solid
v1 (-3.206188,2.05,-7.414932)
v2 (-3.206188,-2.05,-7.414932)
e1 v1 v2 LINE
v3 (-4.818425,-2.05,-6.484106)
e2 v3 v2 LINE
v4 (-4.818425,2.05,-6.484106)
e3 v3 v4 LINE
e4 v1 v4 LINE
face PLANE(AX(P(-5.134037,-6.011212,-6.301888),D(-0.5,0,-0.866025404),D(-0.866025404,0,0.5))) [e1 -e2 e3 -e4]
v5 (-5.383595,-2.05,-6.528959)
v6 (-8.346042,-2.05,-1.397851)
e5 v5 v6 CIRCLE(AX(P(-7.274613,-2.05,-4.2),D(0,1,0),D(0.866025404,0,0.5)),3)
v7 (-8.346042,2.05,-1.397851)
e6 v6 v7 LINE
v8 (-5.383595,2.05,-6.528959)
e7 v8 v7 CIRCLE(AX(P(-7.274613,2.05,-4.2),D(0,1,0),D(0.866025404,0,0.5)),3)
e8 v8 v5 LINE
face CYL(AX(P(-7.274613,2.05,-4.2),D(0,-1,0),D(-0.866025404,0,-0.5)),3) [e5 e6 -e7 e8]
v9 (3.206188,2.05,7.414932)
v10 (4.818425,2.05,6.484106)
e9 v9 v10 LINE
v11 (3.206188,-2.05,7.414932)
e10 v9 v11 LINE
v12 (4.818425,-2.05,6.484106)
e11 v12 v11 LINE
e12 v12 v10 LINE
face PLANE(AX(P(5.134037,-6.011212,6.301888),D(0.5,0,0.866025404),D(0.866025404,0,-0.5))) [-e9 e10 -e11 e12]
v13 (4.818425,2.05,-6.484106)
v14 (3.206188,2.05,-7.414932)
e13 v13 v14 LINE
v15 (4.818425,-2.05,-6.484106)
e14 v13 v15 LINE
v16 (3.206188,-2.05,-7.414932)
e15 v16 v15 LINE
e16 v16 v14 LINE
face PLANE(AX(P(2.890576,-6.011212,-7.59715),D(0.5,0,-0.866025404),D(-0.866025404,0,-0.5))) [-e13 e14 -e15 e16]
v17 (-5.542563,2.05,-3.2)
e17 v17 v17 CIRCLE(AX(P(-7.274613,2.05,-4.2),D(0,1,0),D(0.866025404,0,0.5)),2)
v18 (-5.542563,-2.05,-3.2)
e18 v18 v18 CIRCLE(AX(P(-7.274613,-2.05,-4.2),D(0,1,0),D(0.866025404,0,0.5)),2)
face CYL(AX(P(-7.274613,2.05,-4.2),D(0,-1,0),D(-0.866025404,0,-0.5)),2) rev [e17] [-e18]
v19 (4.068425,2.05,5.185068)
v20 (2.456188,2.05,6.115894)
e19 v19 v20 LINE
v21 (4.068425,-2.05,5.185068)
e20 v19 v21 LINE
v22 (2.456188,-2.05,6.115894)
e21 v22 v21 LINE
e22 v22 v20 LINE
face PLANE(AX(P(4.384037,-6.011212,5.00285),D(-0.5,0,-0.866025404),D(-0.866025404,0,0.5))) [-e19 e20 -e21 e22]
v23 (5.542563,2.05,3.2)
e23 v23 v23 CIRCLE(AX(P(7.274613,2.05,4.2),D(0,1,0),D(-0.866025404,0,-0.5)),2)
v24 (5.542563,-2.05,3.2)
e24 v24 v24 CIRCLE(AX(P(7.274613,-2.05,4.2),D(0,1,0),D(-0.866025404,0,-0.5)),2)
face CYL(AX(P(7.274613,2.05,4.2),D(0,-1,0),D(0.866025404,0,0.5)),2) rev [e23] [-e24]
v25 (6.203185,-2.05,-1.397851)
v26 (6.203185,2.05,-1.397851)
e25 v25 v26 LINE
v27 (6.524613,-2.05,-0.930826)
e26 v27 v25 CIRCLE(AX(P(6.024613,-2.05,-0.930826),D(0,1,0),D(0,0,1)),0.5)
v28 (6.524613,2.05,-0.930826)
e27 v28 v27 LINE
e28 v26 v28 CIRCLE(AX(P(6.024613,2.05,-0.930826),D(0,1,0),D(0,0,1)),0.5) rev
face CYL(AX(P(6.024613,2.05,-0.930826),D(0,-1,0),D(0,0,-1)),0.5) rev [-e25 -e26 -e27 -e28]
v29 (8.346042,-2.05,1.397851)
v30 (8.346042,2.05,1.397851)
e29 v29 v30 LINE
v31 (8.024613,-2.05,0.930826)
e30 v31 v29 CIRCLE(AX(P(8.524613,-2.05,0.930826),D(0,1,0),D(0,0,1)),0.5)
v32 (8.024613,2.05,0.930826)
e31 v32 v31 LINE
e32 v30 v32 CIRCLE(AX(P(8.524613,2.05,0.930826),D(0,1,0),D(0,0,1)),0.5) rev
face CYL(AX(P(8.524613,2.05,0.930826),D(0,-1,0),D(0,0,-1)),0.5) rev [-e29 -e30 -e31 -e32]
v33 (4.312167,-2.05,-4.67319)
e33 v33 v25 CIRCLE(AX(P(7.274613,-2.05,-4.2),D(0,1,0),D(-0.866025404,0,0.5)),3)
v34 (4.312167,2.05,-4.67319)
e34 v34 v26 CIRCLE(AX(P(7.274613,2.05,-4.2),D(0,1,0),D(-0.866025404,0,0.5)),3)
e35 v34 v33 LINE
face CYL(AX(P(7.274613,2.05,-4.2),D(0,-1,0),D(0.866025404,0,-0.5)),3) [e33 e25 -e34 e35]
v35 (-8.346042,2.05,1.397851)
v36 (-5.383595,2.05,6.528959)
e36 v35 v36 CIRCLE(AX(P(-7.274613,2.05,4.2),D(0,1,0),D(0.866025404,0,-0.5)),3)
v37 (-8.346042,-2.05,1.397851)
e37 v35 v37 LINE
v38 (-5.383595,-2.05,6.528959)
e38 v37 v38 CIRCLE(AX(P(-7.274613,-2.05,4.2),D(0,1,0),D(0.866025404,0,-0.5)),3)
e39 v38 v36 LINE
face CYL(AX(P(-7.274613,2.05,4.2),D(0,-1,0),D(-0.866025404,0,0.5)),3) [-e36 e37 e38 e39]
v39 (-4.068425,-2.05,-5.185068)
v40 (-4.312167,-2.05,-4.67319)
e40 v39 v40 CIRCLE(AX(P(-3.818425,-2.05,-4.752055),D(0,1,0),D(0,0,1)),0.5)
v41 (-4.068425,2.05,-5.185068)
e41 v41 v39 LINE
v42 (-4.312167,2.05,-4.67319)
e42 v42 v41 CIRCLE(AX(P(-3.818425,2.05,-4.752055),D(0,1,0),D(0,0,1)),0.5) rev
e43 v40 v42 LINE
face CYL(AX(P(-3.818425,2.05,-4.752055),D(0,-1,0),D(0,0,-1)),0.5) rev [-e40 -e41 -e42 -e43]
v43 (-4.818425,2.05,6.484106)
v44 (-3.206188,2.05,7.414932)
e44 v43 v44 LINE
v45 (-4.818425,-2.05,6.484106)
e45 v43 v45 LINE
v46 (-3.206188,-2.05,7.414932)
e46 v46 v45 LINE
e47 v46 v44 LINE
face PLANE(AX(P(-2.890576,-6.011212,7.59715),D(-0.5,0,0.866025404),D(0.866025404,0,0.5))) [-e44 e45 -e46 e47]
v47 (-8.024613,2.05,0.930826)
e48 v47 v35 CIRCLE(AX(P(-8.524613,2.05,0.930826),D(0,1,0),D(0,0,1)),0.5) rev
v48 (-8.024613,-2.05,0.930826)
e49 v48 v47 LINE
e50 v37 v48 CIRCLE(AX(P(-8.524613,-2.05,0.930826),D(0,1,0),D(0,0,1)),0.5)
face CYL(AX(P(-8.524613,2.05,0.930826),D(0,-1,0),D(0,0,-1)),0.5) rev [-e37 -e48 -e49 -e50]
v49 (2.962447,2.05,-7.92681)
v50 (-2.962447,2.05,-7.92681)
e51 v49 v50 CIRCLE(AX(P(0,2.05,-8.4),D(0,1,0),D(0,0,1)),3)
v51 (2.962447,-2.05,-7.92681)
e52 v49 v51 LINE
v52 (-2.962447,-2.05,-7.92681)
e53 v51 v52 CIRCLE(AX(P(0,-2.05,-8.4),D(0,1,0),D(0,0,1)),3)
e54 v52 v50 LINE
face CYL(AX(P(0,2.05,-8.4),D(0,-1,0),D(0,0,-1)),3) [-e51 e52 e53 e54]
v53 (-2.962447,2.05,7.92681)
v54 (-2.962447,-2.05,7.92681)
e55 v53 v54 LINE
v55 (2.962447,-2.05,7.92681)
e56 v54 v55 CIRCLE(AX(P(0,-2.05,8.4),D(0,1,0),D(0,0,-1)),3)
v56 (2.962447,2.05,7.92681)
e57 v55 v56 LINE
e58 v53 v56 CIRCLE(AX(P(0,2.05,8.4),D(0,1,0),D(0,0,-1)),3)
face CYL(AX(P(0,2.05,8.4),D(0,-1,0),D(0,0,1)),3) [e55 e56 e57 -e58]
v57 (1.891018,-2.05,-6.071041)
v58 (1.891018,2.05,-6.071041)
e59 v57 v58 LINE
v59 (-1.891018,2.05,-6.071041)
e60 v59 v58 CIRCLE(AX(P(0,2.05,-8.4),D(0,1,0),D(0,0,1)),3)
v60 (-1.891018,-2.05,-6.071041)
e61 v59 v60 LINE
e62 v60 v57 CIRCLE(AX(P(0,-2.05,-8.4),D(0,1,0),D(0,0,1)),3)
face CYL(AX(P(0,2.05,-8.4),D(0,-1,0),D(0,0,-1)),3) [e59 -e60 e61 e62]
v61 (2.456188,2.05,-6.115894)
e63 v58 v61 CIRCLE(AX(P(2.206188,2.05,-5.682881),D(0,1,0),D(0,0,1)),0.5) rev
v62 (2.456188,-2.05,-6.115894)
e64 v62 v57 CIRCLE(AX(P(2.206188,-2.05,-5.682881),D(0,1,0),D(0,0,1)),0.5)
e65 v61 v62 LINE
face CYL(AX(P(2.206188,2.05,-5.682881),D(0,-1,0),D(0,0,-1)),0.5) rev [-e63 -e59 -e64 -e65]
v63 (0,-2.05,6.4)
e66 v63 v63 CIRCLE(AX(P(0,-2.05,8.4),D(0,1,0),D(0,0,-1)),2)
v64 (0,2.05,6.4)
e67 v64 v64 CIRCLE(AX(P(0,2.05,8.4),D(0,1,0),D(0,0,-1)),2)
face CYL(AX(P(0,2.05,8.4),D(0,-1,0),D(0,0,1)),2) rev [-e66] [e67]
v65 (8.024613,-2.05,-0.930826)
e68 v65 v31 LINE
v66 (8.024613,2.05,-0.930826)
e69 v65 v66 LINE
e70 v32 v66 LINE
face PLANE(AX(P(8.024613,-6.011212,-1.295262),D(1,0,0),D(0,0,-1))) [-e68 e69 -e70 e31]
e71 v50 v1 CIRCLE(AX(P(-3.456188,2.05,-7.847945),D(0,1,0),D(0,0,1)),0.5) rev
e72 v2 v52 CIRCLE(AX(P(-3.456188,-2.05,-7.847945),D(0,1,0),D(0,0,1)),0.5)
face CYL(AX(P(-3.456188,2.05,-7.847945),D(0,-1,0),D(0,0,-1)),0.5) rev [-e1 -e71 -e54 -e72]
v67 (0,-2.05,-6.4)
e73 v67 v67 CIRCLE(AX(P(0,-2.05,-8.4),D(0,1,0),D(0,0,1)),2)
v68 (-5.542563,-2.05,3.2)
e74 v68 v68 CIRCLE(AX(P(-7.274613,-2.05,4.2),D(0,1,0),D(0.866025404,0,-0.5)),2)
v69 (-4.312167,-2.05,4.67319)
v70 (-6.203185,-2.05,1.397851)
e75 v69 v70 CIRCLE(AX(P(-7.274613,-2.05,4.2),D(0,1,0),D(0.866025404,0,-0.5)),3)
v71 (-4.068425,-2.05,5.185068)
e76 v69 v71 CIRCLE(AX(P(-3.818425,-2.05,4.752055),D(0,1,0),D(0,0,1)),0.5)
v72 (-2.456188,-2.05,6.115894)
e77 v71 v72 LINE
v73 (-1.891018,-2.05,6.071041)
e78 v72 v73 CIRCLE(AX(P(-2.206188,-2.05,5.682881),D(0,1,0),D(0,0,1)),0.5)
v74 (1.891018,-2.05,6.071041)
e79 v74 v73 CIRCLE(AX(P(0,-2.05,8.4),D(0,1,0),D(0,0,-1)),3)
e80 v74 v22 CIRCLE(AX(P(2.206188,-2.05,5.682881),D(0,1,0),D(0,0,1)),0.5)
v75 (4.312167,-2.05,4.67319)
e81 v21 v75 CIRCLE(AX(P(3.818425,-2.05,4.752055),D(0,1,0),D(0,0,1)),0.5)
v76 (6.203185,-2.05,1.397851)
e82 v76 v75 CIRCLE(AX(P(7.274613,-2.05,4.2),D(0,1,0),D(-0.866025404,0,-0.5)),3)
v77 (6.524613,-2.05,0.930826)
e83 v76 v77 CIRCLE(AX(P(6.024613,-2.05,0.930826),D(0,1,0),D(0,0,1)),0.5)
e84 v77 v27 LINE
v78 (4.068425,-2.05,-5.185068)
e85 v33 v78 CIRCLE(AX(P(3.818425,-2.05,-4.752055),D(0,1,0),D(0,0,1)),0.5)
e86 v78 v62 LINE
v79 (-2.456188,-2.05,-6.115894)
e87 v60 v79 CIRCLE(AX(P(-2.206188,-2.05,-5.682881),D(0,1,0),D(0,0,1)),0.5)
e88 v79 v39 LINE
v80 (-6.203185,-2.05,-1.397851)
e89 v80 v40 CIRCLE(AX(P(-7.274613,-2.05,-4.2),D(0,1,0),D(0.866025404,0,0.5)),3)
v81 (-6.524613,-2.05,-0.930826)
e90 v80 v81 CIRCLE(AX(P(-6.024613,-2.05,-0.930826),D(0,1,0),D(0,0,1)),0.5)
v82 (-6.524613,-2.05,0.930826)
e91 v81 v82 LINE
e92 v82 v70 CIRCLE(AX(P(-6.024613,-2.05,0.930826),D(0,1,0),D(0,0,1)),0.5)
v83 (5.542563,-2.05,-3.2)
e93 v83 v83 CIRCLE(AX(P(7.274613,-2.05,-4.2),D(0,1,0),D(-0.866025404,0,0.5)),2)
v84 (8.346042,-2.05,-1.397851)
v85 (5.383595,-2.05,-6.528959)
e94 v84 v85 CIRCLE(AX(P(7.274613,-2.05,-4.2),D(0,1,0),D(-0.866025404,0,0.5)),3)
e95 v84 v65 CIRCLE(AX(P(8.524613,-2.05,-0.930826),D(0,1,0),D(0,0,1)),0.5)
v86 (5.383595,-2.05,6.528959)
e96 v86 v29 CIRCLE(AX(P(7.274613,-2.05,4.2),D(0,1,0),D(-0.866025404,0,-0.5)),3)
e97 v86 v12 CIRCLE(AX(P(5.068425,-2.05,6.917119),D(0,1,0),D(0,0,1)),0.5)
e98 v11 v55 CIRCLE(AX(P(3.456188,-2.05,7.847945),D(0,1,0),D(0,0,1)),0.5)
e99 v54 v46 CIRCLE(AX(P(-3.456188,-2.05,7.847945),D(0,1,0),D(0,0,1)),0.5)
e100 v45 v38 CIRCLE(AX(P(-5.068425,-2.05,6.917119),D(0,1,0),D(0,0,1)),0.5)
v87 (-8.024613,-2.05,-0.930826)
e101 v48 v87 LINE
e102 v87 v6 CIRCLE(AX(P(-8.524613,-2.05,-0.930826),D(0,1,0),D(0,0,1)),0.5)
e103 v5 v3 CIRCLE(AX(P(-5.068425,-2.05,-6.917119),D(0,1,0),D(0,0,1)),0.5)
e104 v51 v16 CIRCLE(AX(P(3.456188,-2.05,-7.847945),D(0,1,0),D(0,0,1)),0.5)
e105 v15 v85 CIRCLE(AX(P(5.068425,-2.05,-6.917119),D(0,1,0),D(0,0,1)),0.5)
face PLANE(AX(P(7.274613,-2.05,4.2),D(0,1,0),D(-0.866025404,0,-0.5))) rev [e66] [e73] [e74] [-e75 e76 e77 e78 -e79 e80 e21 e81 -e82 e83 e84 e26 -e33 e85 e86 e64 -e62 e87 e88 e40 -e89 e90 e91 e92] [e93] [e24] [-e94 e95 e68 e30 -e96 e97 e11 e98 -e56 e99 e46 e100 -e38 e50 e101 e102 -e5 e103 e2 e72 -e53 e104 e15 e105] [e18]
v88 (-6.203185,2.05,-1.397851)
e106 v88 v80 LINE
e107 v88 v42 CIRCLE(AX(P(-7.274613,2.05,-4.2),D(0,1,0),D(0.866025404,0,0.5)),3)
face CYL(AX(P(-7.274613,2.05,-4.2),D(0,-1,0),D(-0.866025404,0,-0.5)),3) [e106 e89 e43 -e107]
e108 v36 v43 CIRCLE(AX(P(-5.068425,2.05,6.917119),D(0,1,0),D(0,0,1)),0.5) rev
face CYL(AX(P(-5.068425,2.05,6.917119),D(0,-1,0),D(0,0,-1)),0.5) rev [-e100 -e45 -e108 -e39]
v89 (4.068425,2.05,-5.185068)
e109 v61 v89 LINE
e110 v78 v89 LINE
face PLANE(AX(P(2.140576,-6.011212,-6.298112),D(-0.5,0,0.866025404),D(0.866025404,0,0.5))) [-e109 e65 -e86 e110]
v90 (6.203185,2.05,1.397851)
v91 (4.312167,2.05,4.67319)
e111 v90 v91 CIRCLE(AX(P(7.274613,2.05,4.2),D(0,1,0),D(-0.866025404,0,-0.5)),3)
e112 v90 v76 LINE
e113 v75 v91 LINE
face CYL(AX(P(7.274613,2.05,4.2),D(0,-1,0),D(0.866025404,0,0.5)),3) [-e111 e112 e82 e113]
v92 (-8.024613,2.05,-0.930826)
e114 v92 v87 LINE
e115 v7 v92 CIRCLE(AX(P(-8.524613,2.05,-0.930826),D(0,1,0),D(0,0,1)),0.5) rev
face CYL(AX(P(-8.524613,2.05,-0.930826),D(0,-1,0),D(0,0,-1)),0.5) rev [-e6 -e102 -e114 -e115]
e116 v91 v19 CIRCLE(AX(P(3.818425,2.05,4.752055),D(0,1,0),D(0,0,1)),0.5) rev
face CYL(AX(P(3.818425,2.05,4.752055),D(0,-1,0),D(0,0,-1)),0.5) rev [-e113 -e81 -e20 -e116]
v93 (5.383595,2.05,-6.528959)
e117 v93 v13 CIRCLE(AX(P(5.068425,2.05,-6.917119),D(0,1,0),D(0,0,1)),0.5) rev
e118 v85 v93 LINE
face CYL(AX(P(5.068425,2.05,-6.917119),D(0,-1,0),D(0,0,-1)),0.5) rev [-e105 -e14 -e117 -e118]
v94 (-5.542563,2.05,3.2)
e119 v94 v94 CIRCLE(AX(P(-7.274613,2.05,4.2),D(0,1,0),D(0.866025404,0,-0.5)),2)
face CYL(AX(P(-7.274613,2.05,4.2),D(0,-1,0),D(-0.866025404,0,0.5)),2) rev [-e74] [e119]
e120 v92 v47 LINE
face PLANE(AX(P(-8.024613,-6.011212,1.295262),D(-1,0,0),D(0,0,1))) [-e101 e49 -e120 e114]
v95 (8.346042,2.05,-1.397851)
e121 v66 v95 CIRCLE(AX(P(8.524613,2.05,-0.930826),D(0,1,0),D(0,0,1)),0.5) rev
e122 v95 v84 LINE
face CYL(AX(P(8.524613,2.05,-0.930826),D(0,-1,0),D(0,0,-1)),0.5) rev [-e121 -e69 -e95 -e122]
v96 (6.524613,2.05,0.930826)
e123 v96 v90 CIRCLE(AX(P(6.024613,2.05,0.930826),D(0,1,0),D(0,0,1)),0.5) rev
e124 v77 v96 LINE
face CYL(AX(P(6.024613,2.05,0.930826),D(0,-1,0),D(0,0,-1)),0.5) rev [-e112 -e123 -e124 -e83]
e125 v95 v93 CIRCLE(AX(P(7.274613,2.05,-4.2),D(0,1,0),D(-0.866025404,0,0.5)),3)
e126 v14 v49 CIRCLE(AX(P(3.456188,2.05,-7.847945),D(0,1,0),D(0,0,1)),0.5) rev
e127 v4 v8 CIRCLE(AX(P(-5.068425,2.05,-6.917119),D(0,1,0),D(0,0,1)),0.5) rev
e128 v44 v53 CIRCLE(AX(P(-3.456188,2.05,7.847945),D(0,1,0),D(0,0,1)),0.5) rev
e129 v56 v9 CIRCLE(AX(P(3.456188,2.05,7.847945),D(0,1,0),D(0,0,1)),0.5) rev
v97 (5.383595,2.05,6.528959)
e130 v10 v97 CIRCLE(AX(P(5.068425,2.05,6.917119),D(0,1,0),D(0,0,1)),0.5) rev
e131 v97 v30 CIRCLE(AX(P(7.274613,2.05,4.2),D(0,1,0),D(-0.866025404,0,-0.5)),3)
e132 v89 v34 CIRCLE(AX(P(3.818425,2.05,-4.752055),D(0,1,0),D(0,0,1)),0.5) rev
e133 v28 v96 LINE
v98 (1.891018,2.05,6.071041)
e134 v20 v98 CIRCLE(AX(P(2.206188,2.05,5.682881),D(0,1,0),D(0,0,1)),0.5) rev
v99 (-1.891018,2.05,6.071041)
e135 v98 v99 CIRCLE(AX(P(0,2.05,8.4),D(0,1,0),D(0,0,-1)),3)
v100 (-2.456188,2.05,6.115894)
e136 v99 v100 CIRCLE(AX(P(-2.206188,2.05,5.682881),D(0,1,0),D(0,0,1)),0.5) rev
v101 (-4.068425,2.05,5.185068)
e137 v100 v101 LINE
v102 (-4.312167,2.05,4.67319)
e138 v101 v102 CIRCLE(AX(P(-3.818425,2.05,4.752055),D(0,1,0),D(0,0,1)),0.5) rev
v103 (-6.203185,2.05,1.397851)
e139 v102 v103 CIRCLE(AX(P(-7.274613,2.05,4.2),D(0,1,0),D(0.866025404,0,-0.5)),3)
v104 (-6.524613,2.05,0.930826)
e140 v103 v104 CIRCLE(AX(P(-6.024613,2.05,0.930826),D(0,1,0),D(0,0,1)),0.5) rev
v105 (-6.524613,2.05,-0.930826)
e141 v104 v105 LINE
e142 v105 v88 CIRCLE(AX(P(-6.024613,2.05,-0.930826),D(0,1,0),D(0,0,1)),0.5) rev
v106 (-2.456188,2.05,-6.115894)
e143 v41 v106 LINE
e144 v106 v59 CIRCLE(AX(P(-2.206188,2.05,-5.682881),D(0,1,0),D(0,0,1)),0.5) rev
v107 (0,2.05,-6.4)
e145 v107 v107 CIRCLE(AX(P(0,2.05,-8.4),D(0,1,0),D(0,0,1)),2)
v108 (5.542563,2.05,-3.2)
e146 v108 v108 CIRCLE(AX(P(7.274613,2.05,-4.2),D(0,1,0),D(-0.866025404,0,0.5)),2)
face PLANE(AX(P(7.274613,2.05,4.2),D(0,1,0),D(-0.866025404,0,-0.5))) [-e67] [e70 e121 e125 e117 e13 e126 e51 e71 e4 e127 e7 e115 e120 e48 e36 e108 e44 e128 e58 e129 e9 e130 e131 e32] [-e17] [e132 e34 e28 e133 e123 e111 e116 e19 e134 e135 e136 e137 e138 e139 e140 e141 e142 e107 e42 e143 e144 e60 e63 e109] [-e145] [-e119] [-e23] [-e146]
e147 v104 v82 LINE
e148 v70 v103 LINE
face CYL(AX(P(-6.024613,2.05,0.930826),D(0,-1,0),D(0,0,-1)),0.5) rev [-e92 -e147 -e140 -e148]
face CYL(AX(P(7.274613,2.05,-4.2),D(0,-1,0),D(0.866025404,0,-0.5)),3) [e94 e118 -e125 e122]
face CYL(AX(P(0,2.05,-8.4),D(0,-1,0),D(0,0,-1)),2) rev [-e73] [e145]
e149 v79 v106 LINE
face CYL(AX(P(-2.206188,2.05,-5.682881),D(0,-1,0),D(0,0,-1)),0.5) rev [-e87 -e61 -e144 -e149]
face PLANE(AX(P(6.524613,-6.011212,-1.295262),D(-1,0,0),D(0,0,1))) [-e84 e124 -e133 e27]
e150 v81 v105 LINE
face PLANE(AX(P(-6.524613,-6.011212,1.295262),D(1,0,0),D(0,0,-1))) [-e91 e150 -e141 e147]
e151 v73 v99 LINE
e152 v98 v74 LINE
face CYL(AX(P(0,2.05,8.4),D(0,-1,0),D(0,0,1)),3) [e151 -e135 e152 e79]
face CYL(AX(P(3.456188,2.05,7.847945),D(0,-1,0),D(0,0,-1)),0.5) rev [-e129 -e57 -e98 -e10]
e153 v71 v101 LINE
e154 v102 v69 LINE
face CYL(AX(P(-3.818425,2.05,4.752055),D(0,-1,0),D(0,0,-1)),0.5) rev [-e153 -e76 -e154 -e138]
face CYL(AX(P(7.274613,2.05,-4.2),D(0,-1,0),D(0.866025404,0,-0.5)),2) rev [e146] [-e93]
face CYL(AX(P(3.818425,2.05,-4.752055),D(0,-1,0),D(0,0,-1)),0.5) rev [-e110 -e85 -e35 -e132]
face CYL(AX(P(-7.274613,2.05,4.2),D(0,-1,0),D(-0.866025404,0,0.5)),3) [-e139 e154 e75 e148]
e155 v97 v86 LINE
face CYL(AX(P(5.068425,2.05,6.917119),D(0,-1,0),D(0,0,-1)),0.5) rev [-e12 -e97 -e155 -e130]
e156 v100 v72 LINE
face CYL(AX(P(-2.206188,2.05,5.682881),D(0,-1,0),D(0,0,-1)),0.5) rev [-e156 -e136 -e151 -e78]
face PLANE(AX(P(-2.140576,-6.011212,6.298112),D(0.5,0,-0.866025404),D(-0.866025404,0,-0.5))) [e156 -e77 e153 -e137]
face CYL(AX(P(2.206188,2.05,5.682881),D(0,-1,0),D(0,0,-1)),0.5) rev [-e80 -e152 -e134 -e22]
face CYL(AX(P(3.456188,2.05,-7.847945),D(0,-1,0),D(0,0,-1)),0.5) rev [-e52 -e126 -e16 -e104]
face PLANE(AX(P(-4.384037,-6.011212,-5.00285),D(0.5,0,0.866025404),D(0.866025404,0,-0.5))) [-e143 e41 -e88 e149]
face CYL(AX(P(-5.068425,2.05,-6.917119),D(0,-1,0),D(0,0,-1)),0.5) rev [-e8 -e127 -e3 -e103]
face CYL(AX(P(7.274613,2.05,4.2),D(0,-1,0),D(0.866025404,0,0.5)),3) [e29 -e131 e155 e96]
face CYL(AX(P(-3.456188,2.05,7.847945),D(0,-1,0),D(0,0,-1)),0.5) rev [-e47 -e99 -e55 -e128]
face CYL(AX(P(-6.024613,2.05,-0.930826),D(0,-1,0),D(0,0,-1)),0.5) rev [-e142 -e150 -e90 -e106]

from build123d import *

# Parameters (mm, degrees)
SKETCH1_R           = 3
SKETCH1_R_2         = 2
BOSS_EXTRUDE1_DEPTH = 2.05
CIRPATTERN7_COUNT   = 6
BOSS_EXTRUDE4_DEPTH = 4.1
CIRPATTERN8_COUNT   = 6
FILLET3_R           = 0.5


with BuildPart() as part:
    # Sketch1 → Boss-Extrude1 (new, symmetric)
    with BuildSketch(Plane(origin=(0, 0, 0), x_dir=(1, 0, 0), z_dir=(0, 1, 0))):
        with Locations(Location((0, 8.4, 0), (0, 0, 270))):
            Circle(SKETCH1_R)
        with Locations(Location((0, 8.4, 0), (0, 0, 270))):
            Circle(SKETCH1_R_2, mode=Mode.SUBTRACT)
    extrude(amount=BOSS_EXTRUDE1_DEPTH, both=True)


with BuildPart() as cirpattern7_1:
    # CirPattern7: pattern copy
    add(part.part.rotate(Axis((0, 0, 0), (0, 1, 0)), 1 * 360 / CIRPATTERN7_COUNT))


with BuildPart() as cirpattern7_2:
    # CirPattern7: pattern copy
    add(part.part.rotate(Axis((0, 0, 0), (0, 1, 0)), 2 * 360 / CIRPATTERN7_COUNT))


with BuildPart() as cirpattern7_3:
    # CirPattern7: pattern copy
    add(part.part.rotate(Axis((0, 0, 0), (0, 1, 0)), 3 * 360 / CIRPATTERN7_COUNT))


with BuildPart() as cirpattern7_4:
    # CirPattern7: pattern copy
    add(part.part.rotate(Axis((0, 0, 0), (0, 1, 0)), 4 * 360 / CIRPATTERN7_COUNT))


with BuildPart() as cirpattern7_5:
    # CirPattern7: pattern copy
    add(part.part.rotate(Axis((0, 0, 0), (0, 1, 0)), 5 * 360 / CIRPATTERN7_COUNT))


with BuildPart() as part_1:
    add(part.part)

    # Sketch5 → Boss-Extrude4 (add)
    with BuildSketch(Plane(origin=(0, 2.05, 0), x_dir=(1, 0, 0), z_dir=(0, 1, 0))):
        with BuildLine():
            Line((-4.384036917, 5.002849702), (-2.140576475, 6.298112192))
            ThreePointArc((-2.140576475, 6.298112192), (-2.598076211, 6.9), (-2.890576475, 7.597150298))
            Line((-2.890576475, 7.597150298), (-5.134036917, 6.301887808))
            ThreePointArc((-5.134036917, 6.301887808), (-4.67653718, 5.7), (-4.384036917, 5.002849702))
        make_face()
    extrude(amount=-BOSS_EXTRUDE4_DEPTH)


with BuildPart() as cirpattern8_1:
    # CirPattern8: pattern copy
    add(part_1.part.rotate(Axis((0, 0, 0), (0, 1, 0)), 1 * 360 / CIRPATTERN8_COUNT))


with BuildPart() as cirpattern8_2:
    # CirPattern8: pattern copy
    add(part_1.part.rotate(Axis((0, 0, 0), (0, 1, 0)), 2 * 360 / CIRPATTERN8_COUNT))


with BuildPart() as cirpattern8_3:
    # CirPattern8: pattern copy
    add(part_1.part.rotate(Axis((0, 0, 0), (0, 1, 0)), 3 * 360 / CIRPATTERN8_COUNT))


with BuildPart() as cirpattern8_4:
    # CirPattern8: pattern copy
    add(part_1.part.rotate(Axis((0, 0, 0), (0, 1, 0)), 4 * 360 / CIRPATTERN8_COUNT))


with BuildPart() as cirpattern8_5:
    # CirPattern8: pattern copy
    add(part_1.part.rotate(Axis((0, 0, 0), (0, 1, 0)), 5 * 360 / CIRPATTERN8_COUNT))


with BuildPart() as cirpattern8_4_1:
    add(cirpattern8_4.part)

    # Combine1: read off the stored shape, not the designer's step
    # Combine1: union CirPattern7_5, CirPattern7_3, CirPattern7_2, CirPattern7_1, part, CirPattern8_5, CirPattern8_3, CirPattern8_2, CirPattern8_1, CirPattern7_4
    add(cirpattern7_5.part)
    add(cirpattern7_3.part)
    add(cirpattern7_2.part)
    add(cirpattern7_1.part)
    add(part_1.part)
    add(cirpattern8_5.part)
    add(cirpattern8_3.part)
    add(cirpattern8_2.part)
    add(cirpattern8_1.part)
    add(cirpattern7_4.part)

    # Fillet3
    fillet3_edges = [cirpattern8_4_1.edges().sort_by_distance(p)[0] for p in [
        (-8.024613392, 0, -1.29526249),
        (-4.384036917, 0, -5.002849702),
        (-8.024613392, 0, 1.29526249),
        (-6.524613392, 0, -1.29526249),
        (-6.524613392, 0, 1.29526249),
        (-5.134036917, 0, 6.301887808),
        (-2.890576475, 0, 7.597150298),
        (-4.384036917, 0, 5.002849702),
        (-2.140576475, 0, 6.298112192),
        (2.890576475, 0, 7.597150298),
        (5.134036917, 0, 6.301887808),
        (2.140576475, 0, 6.298112192),
        (4.384036917, 0, 5.002849702),
        (8.024613392, 0, 1.29526249),
        (8.024613392, 0, -1.29526249),
        (6.524613392, 0, 1.29526249),
        (6.524613392, 0, -1.29526249),
        (5.134036917, 0, -6.301887808),
        (2.890576475, 0, -7.597150298),
        (4.384036917, 0, -5.002849702),
        (2.140576475, 0, -6.298112192),
        (-2.890576475, 0, -7.597150298),
        (-5.134036917, 0, -6.301887808),
        (-2.140576475, 0, -6.298112192),
    ]]
    fillet(fillet3_edges, radius=FILLET3_R)


solid = cirpattern8_4_1.part
